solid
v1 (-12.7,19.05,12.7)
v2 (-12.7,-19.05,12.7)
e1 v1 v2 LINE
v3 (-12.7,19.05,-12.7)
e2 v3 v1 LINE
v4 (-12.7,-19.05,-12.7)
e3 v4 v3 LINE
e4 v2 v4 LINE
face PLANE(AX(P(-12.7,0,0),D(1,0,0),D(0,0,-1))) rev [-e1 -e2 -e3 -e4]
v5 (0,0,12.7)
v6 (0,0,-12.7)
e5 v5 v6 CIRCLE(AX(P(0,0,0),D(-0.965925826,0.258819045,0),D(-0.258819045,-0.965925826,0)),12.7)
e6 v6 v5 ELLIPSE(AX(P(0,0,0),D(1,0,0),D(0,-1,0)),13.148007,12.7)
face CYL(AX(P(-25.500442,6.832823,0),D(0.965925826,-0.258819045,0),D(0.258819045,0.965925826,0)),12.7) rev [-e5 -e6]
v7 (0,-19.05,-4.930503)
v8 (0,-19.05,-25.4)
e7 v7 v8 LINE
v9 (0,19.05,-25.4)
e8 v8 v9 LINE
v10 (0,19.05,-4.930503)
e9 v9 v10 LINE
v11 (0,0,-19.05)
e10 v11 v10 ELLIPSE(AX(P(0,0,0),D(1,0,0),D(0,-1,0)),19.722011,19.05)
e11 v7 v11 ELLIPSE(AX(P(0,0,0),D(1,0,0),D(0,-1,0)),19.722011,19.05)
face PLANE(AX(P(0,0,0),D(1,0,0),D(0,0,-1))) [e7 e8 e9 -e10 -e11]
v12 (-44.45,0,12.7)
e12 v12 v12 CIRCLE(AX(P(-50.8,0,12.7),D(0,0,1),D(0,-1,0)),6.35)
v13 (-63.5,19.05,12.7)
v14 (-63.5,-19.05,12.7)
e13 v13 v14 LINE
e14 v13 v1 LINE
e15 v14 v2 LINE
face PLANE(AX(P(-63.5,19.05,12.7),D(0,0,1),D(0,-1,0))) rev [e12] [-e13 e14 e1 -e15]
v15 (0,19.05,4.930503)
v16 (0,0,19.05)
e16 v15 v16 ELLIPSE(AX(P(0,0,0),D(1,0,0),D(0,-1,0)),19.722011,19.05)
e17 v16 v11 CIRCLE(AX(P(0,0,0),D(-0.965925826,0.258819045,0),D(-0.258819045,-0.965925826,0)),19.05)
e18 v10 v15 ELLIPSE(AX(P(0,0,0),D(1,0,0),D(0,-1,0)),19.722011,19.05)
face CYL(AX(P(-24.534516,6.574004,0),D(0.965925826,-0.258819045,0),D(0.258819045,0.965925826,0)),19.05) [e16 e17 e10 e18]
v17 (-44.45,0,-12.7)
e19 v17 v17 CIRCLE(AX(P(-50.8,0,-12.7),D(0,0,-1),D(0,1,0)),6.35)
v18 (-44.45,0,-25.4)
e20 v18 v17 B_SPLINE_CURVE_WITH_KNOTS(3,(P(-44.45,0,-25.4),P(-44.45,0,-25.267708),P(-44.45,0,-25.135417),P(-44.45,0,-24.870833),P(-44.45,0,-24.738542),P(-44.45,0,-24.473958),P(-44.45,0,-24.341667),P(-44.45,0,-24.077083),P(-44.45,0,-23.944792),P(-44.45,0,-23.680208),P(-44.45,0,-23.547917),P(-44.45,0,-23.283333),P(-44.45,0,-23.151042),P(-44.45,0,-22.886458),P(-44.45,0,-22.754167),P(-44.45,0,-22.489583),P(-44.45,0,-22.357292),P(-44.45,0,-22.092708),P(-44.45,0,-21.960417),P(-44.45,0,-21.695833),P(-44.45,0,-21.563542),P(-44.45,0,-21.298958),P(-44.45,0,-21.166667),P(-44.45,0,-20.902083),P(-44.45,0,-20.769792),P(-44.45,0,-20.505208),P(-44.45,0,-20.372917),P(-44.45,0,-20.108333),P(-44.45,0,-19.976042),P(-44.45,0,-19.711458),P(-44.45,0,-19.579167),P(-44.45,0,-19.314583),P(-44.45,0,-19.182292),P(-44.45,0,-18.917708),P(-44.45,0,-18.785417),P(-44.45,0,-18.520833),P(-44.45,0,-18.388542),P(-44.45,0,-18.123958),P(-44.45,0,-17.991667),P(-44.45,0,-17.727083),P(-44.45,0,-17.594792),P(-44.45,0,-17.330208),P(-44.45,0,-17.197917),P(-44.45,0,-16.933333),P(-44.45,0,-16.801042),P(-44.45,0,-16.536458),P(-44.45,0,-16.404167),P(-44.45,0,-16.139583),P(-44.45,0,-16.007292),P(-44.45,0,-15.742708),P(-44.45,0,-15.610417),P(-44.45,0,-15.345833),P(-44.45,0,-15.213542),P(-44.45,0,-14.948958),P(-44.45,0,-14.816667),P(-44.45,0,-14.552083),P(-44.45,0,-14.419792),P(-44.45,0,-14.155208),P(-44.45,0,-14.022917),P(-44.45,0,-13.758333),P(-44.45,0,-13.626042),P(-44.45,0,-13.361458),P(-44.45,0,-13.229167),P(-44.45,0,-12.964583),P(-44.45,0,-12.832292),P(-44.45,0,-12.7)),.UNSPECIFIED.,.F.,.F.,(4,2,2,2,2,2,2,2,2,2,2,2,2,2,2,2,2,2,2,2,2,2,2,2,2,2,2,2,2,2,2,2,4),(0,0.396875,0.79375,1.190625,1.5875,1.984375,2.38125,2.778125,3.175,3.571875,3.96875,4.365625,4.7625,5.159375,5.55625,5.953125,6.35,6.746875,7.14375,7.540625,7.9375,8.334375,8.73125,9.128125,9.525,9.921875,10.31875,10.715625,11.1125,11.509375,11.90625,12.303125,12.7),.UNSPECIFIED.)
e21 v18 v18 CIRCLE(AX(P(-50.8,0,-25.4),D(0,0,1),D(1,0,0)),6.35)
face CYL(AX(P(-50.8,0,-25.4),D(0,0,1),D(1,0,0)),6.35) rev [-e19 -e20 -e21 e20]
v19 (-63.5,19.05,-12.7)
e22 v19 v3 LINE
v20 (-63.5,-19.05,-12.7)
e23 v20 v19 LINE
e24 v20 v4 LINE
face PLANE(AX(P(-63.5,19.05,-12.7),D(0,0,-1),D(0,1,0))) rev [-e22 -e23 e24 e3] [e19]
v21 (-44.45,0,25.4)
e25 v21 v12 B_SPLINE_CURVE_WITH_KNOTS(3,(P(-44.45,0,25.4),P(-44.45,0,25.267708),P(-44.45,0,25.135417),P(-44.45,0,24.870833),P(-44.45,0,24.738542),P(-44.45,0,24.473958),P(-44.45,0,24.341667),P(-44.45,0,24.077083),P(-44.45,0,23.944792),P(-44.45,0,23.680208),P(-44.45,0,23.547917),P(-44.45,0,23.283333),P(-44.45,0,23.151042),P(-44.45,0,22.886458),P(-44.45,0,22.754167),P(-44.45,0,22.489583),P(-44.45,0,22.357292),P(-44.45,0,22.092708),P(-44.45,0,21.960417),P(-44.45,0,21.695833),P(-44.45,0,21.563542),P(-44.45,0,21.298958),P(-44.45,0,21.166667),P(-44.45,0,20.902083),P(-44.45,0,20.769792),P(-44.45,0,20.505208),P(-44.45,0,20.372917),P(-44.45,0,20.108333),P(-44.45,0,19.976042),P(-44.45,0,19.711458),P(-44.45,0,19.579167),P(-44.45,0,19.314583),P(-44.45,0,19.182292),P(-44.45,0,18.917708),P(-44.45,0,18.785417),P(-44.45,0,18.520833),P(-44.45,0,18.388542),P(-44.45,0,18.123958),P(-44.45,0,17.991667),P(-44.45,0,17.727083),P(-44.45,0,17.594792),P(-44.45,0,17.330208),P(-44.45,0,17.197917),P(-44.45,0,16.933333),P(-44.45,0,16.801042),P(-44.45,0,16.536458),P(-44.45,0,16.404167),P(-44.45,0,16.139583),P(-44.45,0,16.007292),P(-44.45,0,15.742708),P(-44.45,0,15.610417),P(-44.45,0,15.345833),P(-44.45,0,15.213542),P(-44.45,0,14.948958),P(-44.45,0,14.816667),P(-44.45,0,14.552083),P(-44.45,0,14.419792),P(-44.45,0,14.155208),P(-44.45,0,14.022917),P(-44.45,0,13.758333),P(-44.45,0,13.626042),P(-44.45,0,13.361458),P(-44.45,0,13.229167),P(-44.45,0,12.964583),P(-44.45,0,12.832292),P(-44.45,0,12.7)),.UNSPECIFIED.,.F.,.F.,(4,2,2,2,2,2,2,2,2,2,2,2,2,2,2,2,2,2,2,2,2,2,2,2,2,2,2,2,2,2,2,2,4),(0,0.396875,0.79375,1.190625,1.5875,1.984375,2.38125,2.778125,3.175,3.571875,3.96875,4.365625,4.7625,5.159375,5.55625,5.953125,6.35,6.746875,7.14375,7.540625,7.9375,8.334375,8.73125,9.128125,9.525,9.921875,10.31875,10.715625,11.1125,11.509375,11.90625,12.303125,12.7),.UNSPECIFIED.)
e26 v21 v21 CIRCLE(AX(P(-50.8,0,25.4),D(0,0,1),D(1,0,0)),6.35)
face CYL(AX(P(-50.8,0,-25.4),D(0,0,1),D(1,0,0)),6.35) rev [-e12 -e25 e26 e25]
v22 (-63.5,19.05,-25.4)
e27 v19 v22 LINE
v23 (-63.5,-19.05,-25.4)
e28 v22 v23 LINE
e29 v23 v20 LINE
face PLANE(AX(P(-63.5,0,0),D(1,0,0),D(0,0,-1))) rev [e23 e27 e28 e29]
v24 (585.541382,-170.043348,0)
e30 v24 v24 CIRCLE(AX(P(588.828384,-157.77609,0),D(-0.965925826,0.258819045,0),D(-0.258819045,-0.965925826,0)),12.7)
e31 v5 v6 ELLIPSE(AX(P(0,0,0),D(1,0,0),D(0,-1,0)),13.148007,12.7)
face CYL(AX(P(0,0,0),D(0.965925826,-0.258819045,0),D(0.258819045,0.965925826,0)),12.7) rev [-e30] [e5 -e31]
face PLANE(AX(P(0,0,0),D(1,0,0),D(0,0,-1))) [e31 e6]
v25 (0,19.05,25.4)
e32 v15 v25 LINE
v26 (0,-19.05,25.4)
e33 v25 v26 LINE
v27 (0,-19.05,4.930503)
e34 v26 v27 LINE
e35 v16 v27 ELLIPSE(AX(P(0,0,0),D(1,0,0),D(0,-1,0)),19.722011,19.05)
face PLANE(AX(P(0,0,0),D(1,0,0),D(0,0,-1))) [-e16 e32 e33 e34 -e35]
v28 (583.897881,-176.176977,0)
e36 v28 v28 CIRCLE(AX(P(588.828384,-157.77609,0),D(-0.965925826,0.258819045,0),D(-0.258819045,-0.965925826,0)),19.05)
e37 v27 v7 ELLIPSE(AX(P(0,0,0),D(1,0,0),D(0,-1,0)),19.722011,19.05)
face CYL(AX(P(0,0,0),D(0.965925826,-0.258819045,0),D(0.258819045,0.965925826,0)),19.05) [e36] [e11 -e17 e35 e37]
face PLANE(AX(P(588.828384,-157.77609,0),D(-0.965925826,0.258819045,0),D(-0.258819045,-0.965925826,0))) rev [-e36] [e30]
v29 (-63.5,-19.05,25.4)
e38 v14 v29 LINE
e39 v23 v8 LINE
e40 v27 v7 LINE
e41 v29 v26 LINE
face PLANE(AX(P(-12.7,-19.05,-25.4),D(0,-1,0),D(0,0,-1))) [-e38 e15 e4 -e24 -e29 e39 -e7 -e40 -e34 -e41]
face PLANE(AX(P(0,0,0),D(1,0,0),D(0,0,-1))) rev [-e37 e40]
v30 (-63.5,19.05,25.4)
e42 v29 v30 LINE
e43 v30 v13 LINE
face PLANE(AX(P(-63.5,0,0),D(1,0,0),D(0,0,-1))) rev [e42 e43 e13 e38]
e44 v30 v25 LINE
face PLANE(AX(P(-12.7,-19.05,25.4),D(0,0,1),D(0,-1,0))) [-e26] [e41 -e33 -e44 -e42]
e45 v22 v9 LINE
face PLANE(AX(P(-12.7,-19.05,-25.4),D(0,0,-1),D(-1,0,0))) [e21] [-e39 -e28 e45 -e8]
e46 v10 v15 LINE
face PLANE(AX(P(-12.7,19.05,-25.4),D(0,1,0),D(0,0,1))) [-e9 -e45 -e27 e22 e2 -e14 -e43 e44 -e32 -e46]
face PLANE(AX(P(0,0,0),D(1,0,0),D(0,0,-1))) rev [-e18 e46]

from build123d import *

# Parameters (mm, degrees)
SWEEP1_START         = -25.4
SWEEP1_OUTLINE_R     = 19.05
SWEEP1_DEPTH         = 635
CUT_SWEEP1_START     = -25.4
CUT_SWEEP1_OUTLINE_R = 12.7
CUT_SWEEP1_DEPTH     = 635
SKETCH25_R           = 57.15
CUT_EXTRUDE1_DEPTH   = 620.637672354
SKETCH26_W           = 50.8
SKETCH26_H           = 38.1
BOSS_EXTRUDE1_DEPTH  = 12.7
SKETCH27_W           = 12.7
SKETCH27_H           = 38.1
BOSS_EXTRUDE2_DEPTH  = 50.8
SKETCH28_R           = 6.35
CUT_EXTRUDE2_DEPTH   = 622.424639437


# Read off the part's stored shape, not the designer's step: Sweep1, Cut-Sweep1
with BuildPart() as part:
    # Sweep1 outline → Sweep1 (new body)
    with BuildSketch(Plane(origin=(0, 0, 0), x_dir=(0.2588190451025211, 0.9659258262890682, 0), z_dir=(0.9659258262890682, -0.2588190451025211, 0)).offset(SWEEP1_START)):
        Circle(SWEEP1_OUTLINE_R)
    extrude(amount=SWEEP1_DEPTH)

    # Cut-Sweep1 outline → Cut-Sweep1 (cut)
    with BuildSketch(Plane(origin=(0, 0, 0), x_dir=(0.2588190451025211, 0.9659258262890682, 0), z_dir=(0.9659258262890682, -0.2588190451025211, 0)).offset(CUT_SWEEP1_START)):
        Circle(CUT_SWEEP1_OUTLINE_R)
    extrude(amount=CUT_SWEEP1_DEPTH, mode=Mode.SUBTRACT)

    # Sketch25 → Cut-Extrude1 (cut, through all)
    with BuildSketch(Plane(origin=(0, 0, 0), x_dir=(0, 0, -1), z_dir=(1, 0, 0))):
        Circle(SKETCH25_R)
    extrude(amount=-CUT_EXTRUDE1_DEPTH, mode=Mode.SUBTRACT)

    # Sketch26 → Boss-Extrude1 (add)
    with BuildSketch(Plane(origin=(0, 0, 0), x_dir=(0, 0, -1), z_dir=(1, 0, 0))):
        Rectangle(SKETCH26_W, SKETCH26_H)
    extrude(amount=-BOSS_EXTRUDE1_DEPTH)

    # Sketch27 → Boss-Extrude2 (add)
    with BuildSketch(Plane.ZY.offset(12.7)):
        with Locations((19.05, 0)):
            Rectangle(SKETCH27_W, SKETCH27_H)
        with Locations((-19.05, 0)):
            Rectangle(SKETCH27_W, SKETCH27_H)
    extrude(amount=BOSS_EXTRUDE2_DEPTH)

    # Sketch28 → Cut-Extrude2 (cut, through all)
    with BuildSketch(Plane.XY.offset(25.4)):
        with Locations((-50.8, 0)):
            Circle(SKETCH28_R)
    extrude(amount=-CUT_EXTRUDE2_DEPTH, mode=Mode.SUBTRACT)


solid = part.part
